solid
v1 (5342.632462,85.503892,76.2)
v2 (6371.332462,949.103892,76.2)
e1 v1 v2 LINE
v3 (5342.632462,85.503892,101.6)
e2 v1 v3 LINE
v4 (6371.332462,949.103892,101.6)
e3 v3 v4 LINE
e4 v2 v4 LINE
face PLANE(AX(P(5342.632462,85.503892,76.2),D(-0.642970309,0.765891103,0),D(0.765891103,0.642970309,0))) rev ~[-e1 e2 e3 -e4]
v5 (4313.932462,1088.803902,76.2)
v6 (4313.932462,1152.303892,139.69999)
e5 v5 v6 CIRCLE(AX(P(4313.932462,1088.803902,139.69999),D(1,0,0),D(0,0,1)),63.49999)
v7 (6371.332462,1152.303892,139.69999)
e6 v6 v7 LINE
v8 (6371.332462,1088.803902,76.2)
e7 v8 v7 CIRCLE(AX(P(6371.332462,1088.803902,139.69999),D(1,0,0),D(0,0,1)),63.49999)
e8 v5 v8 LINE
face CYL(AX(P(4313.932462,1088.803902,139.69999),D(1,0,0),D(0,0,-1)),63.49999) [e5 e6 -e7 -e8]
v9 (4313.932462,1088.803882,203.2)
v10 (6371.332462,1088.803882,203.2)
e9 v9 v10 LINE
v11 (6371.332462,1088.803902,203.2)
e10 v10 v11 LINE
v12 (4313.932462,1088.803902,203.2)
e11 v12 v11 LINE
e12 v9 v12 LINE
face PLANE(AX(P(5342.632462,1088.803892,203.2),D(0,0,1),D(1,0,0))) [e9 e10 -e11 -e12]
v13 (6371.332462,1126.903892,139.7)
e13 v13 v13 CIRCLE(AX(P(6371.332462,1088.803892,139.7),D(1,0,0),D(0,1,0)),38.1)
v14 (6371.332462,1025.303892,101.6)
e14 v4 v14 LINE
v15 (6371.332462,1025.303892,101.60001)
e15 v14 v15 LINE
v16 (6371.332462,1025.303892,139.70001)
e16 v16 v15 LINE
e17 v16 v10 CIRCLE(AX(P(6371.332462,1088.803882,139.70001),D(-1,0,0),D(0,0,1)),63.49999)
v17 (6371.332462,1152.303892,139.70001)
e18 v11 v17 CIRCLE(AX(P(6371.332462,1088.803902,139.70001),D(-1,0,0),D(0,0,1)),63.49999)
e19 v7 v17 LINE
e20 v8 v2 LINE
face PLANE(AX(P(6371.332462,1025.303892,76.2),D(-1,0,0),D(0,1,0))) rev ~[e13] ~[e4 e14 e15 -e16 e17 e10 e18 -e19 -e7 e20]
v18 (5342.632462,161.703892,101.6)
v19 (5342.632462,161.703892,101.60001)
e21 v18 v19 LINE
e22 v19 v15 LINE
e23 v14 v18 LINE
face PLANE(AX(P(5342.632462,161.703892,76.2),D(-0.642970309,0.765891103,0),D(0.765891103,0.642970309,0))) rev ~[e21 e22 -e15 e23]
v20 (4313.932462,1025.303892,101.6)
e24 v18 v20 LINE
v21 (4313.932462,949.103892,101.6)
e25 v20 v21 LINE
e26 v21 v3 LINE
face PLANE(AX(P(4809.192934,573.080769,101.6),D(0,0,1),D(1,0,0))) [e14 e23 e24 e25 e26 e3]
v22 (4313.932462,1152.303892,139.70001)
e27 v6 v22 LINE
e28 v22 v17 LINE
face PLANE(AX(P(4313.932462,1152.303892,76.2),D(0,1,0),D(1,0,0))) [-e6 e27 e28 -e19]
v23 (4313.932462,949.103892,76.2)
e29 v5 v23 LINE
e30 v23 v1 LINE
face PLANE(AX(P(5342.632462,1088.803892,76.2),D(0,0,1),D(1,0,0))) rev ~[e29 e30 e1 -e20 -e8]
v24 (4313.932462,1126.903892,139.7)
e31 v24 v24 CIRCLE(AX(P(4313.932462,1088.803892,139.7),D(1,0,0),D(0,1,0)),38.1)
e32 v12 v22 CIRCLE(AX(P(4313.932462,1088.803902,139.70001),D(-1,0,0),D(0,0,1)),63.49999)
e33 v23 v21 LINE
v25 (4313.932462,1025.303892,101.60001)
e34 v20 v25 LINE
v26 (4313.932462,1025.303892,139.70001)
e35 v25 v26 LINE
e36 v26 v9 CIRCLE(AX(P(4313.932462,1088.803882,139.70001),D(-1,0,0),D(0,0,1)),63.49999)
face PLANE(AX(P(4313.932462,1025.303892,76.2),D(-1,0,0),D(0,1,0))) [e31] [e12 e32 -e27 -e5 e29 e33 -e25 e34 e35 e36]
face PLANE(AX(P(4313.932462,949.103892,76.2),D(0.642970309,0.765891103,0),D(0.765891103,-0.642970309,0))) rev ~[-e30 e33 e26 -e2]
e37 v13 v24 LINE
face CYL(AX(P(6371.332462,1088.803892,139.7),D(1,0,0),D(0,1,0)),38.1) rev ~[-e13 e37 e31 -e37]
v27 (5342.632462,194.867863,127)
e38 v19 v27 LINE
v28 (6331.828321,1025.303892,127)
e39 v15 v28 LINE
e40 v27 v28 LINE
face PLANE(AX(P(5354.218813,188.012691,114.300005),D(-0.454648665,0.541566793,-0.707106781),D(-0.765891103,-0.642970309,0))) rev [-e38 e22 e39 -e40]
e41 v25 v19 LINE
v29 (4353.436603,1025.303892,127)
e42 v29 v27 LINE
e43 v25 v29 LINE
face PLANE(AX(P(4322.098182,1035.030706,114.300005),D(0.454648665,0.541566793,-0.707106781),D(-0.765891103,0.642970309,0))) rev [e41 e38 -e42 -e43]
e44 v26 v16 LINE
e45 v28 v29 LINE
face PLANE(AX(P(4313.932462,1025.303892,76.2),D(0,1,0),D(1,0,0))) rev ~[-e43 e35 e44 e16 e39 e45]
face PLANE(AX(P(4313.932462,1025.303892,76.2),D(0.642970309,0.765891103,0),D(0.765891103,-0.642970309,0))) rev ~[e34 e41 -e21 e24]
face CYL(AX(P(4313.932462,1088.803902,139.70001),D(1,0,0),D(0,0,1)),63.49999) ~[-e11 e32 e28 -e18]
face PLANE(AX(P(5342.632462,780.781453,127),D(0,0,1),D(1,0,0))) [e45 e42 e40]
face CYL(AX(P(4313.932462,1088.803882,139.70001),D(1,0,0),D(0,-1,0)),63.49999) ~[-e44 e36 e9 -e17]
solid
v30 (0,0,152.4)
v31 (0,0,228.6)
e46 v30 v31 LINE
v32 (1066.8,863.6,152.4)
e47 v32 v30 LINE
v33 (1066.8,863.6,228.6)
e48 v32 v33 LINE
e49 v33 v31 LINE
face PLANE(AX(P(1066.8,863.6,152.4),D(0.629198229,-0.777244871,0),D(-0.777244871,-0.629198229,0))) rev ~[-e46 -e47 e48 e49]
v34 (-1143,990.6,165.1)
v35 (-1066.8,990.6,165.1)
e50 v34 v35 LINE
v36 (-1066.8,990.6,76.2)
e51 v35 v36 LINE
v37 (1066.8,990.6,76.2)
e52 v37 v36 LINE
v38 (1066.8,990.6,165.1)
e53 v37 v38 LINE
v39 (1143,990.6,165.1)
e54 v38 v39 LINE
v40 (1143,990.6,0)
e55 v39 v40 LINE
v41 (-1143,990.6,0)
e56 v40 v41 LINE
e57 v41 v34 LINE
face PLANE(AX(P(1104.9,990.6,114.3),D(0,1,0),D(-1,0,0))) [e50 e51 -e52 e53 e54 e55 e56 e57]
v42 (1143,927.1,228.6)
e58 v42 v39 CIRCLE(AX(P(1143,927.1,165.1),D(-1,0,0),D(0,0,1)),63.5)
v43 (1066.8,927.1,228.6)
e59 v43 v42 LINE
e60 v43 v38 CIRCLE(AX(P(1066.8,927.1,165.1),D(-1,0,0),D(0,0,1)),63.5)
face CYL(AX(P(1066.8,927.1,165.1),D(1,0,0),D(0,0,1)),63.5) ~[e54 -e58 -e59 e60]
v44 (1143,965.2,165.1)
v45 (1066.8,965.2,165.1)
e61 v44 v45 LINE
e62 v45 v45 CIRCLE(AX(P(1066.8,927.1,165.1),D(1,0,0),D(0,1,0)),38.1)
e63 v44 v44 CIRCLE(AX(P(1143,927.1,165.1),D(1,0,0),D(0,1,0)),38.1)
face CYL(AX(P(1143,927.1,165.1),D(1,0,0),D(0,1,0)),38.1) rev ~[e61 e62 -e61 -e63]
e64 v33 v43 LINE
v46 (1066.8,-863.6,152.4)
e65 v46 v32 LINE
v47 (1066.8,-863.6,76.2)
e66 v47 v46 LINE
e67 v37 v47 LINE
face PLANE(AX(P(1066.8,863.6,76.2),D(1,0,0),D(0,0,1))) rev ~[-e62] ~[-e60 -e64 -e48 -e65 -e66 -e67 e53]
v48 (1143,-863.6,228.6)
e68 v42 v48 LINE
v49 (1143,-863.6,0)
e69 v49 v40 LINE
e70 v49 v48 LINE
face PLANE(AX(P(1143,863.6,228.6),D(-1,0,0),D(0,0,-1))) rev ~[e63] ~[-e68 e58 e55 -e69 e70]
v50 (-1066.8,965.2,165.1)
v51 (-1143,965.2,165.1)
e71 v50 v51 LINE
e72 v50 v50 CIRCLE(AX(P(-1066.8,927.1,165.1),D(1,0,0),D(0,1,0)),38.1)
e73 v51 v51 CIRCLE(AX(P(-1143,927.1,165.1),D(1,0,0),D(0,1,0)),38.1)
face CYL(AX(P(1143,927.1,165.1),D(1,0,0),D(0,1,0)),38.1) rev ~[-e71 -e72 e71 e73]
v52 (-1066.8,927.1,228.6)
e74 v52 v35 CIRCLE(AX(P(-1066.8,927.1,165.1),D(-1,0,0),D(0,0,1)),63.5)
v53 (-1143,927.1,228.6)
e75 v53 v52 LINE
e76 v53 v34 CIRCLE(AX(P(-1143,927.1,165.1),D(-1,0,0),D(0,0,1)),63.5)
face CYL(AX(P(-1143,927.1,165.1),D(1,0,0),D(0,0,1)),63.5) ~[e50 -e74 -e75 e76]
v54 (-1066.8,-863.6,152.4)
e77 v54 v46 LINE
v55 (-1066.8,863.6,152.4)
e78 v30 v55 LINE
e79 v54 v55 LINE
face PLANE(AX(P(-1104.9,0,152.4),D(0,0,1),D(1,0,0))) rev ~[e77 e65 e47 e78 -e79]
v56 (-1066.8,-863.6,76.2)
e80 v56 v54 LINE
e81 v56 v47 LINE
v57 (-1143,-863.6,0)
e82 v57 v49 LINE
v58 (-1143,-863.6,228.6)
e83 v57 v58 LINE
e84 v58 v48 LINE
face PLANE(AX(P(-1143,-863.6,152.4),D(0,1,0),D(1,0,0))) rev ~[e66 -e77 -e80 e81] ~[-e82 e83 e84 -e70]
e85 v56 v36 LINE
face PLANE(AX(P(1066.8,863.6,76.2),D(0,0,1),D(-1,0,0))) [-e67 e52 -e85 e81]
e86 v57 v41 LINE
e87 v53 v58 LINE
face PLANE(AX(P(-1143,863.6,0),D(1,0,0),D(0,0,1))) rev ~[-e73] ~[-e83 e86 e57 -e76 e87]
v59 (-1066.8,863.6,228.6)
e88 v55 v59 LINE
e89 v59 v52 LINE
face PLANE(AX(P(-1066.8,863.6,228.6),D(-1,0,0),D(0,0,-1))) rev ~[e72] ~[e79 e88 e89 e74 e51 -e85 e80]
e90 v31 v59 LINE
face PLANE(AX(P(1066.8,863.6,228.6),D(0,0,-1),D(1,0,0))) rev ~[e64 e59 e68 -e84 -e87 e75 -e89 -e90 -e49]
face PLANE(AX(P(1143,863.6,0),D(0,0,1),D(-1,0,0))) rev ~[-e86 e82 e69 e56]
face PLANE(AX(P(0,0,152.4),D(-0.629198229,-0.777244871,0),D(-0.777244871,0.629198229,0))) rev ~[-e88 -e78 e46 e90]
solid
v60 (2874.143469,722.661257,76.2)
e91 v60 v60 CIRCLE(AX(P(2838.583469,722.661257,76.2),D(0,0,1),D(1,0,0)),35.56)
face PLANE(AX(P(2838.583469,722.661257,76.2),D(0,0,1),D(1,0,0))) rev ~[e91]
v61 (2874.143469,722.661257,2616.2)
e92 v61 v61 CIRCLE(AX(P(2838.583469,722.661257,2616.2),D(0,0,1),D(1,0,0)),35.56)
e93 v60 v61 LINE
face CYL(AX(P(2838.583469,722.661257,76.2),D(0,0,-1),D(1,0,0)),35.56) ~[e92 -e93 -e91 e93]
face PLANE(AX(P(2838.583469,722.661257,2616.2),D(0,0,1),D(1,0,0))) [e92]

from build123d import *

# Parameters (mm, degrees)
F0_W      = 2286
F0_H      = 1727.2
F1_DEPTH  = 76.2
F2_W      = 76.2
F2_H      = 1727.2
F3_DEPTH  = 76.2
F5_START  = 76.2
F4_W      = 76.2
F4_H      = 1727.2
F5_DEPTH  = 76.2
F6_W      = 2133.6
F6_H      = 76.2
F7_DEPTH  = 127
F9_R      = 38.1
F10_DEPTH = 2291.08
F12_DEPTH = 50.8
F13_DEPTH = 25.4
F11_W     = 2057.4
F11_H     = 127
F14_DEPTH = 127
F15_R     = 38.1
F16_DEPTH = 2276.856
F17_R     = 63.49999
F18_SIZE  = 25.39999
F19_SIZE  = 25.39999
F20_R     = 63.5
F21_R     = 35.56
F22_DEPTH = 2540


# Not quite as in the source:
# - a fillet or chamfer is up to 0.001 mm smaller than in the source, because OpenCascade refuses the exact size


with BuildPart() as f1:
    # F0 (on Top) → F1 (new body)
    with BuildSketch(Plane.XY):
        Rectangle(F0_W, F0_H)
    extrude(amount=F1_DEPTH)

    # F2 (on face) → F3 (join)
    with BuildSketch(Plane.XY.offset(76.2)):
        with Locations((-1104.9, 0)):
            Rectangle(F2_W, F2_H)
        with Locations((1104.9, 0)):
            Rectangle(F2_W, F2_H)
    extrude(amount=F3_DEPTH)

    # F4 (on face) → F5 (join)
    with BuildSketch(Plane.XY.offset(76.2).offset(F5_START)):
        with Locations((-1104.9, 0)):
            Rectangle(F4_W, F4_H)
        with Locations((1104.9, 0)):
            Rectangle(F4_W, F4_H)
        Polygon((-1066.8, 863.6), (-1066.8, -863.6), (1066.8, -863.6), (1066.8, 863.6), (0, 0), align=None)
    extrude(amount=F5_DEPTH)

    # F6 (on face) → F7 (join)
    with BuildSketch(Plane(origin=(0, 863.6, 0), x_dir=(-1, 0, 0), z_dir=(0, 1, 0))):
        Polygon((-1143, 228.6), (-1143, 0), (-1066.8, 0), (-1066.8, 76.2), (-1066.8, 152.4), (-1066.8, 228.6), align=None)
        Polygon((1066.8, 76.2), (1066.8, 0), (1143, 0), (1143, 228.6), (1066.8, 228.6), (1066.8, 152.4), align=None)
        with Locations((0, 38.1)):
            Rectangle(F6_W, F6_H)
    extrude(amount=F7_DEPTH)

    # F9 (on face) → F10 (cut)
    with BuildSketch(Plane.YZ.offset(1143)):
        with Locations((927.1, 165.1)):
            Circle(F9_R)
    extrude(amount=-F10_DEPTH, mode=Mode.SUBTRACT)

    # F20
    f20_edges = [f1.edges().sort_by_distance(p)[0] for p in [
        (-1104.9, 990.6, 228.6),
        (1104.9, 990.6, 228.6),
    ]]
    fillet(f20_edges, radius=F20_R)


with BuildPart() as f12:
    # F11 (on face) → F12 (new body)
    with BuildSketch(Plane.XY.offset(76.2)):
        Polygon((6371.3324619645, 1025.3038924217), (4313.9324619645, 1025.3038924217), (5342.6324619645, 161.7038924217), align=None)
    extrude(amount=F12_DEPTH)

    # F11 (on face) → F13 (join)
    with BuildSketch(Plane.XY.offset(76.2)):
        Polygon((5342.6324619645, 161.7038924217), (4313.9324619645, 1025.3038924217), (4313.9324619645, 949.1038924217), (5251.8648149057, 161.7038924217), align=None)
        Polygon((6371.3324619645, 949.1038924217), (6371.3324619645, 1025.3038924217), (5342.6324619645, 161.7038924217), (5433.4001090233, 161.7038924217), align=None)
        Polygon((5433.4001090233, 161.7038924217), (5342.6324619645, 161.7038924217), (5342.6324619645, 85.5038924217), align=None)
        Polygon((5342.6324619645, 85.5038924217), (5342.6324619645, 161.7038924217), (5251.8648149057, 161.7038924217), align=None)
    extrude(amount=F13_DEPTH)

    # F11 (on face) → F14 (join)
    with BuildSketch(Plane.XY.offset(76.2)):
        with Locations((5342.6324619645, 1088.8038924217)):
            Rectangle(F11_W, F11_H)
    extrude(amount=F14_DEPTH)

    # F15 (on face) → F16 (cut)
    with BuildSketch(Plane.YZ.offset(6371.3324619645)):
        with Locations((1088.8038924217, 139.7)):
            Circle(F15_R)
    extrude(amount=-F16_DEPTH, mode=Mode.SUBTRACT)

    # F17 (radius 63.5 in the source; OpenCascade refuses exactly that, so slightly less here)
    f17_edges = [f12.edges().sort_by_distance(p)[0] for p in [
        (5342.632462, 1152.303892, 203.2),
        (5342.632462, 1025.303892, 203.2),
        (5342.632462, 1152.303892, 76.2),
    ]]
    fillet(f17_edges, radius=F17_R)

    # F18 (size 25.4 in the source; OpenCascade refuses exactly that, so slightly less here)
    f18_edges = [f12.edges().sort_by_distance(p)[0] for p in [
        (4828.282462, 593.503892, 127),
    ]]
    chamfer(f18_edges, length=F18_SIZE)

    # F19 (size 25.4 in the source; OpenCascade refuses exactly that, so slightly less here)
    f19_edges = [f12.edges().sort_by_distance(p)[0] for p in [
        (5866.858497, 601.794885, 127),
    ]]
    chamfer(f19_edges, length=F19_SIZE)


with BuildPart() as f22:
    # F21 (on face) → F22 (new body)
    with BuildSketch(Plane.XY.offset(76.2)):
        with Locations((2838.5834693909, 722.6612567902)):
            Circle(F21_R)
    extrude(amount=F22_DEPTH)


solid = Compound([f1.part, f12.part, f22.part])
